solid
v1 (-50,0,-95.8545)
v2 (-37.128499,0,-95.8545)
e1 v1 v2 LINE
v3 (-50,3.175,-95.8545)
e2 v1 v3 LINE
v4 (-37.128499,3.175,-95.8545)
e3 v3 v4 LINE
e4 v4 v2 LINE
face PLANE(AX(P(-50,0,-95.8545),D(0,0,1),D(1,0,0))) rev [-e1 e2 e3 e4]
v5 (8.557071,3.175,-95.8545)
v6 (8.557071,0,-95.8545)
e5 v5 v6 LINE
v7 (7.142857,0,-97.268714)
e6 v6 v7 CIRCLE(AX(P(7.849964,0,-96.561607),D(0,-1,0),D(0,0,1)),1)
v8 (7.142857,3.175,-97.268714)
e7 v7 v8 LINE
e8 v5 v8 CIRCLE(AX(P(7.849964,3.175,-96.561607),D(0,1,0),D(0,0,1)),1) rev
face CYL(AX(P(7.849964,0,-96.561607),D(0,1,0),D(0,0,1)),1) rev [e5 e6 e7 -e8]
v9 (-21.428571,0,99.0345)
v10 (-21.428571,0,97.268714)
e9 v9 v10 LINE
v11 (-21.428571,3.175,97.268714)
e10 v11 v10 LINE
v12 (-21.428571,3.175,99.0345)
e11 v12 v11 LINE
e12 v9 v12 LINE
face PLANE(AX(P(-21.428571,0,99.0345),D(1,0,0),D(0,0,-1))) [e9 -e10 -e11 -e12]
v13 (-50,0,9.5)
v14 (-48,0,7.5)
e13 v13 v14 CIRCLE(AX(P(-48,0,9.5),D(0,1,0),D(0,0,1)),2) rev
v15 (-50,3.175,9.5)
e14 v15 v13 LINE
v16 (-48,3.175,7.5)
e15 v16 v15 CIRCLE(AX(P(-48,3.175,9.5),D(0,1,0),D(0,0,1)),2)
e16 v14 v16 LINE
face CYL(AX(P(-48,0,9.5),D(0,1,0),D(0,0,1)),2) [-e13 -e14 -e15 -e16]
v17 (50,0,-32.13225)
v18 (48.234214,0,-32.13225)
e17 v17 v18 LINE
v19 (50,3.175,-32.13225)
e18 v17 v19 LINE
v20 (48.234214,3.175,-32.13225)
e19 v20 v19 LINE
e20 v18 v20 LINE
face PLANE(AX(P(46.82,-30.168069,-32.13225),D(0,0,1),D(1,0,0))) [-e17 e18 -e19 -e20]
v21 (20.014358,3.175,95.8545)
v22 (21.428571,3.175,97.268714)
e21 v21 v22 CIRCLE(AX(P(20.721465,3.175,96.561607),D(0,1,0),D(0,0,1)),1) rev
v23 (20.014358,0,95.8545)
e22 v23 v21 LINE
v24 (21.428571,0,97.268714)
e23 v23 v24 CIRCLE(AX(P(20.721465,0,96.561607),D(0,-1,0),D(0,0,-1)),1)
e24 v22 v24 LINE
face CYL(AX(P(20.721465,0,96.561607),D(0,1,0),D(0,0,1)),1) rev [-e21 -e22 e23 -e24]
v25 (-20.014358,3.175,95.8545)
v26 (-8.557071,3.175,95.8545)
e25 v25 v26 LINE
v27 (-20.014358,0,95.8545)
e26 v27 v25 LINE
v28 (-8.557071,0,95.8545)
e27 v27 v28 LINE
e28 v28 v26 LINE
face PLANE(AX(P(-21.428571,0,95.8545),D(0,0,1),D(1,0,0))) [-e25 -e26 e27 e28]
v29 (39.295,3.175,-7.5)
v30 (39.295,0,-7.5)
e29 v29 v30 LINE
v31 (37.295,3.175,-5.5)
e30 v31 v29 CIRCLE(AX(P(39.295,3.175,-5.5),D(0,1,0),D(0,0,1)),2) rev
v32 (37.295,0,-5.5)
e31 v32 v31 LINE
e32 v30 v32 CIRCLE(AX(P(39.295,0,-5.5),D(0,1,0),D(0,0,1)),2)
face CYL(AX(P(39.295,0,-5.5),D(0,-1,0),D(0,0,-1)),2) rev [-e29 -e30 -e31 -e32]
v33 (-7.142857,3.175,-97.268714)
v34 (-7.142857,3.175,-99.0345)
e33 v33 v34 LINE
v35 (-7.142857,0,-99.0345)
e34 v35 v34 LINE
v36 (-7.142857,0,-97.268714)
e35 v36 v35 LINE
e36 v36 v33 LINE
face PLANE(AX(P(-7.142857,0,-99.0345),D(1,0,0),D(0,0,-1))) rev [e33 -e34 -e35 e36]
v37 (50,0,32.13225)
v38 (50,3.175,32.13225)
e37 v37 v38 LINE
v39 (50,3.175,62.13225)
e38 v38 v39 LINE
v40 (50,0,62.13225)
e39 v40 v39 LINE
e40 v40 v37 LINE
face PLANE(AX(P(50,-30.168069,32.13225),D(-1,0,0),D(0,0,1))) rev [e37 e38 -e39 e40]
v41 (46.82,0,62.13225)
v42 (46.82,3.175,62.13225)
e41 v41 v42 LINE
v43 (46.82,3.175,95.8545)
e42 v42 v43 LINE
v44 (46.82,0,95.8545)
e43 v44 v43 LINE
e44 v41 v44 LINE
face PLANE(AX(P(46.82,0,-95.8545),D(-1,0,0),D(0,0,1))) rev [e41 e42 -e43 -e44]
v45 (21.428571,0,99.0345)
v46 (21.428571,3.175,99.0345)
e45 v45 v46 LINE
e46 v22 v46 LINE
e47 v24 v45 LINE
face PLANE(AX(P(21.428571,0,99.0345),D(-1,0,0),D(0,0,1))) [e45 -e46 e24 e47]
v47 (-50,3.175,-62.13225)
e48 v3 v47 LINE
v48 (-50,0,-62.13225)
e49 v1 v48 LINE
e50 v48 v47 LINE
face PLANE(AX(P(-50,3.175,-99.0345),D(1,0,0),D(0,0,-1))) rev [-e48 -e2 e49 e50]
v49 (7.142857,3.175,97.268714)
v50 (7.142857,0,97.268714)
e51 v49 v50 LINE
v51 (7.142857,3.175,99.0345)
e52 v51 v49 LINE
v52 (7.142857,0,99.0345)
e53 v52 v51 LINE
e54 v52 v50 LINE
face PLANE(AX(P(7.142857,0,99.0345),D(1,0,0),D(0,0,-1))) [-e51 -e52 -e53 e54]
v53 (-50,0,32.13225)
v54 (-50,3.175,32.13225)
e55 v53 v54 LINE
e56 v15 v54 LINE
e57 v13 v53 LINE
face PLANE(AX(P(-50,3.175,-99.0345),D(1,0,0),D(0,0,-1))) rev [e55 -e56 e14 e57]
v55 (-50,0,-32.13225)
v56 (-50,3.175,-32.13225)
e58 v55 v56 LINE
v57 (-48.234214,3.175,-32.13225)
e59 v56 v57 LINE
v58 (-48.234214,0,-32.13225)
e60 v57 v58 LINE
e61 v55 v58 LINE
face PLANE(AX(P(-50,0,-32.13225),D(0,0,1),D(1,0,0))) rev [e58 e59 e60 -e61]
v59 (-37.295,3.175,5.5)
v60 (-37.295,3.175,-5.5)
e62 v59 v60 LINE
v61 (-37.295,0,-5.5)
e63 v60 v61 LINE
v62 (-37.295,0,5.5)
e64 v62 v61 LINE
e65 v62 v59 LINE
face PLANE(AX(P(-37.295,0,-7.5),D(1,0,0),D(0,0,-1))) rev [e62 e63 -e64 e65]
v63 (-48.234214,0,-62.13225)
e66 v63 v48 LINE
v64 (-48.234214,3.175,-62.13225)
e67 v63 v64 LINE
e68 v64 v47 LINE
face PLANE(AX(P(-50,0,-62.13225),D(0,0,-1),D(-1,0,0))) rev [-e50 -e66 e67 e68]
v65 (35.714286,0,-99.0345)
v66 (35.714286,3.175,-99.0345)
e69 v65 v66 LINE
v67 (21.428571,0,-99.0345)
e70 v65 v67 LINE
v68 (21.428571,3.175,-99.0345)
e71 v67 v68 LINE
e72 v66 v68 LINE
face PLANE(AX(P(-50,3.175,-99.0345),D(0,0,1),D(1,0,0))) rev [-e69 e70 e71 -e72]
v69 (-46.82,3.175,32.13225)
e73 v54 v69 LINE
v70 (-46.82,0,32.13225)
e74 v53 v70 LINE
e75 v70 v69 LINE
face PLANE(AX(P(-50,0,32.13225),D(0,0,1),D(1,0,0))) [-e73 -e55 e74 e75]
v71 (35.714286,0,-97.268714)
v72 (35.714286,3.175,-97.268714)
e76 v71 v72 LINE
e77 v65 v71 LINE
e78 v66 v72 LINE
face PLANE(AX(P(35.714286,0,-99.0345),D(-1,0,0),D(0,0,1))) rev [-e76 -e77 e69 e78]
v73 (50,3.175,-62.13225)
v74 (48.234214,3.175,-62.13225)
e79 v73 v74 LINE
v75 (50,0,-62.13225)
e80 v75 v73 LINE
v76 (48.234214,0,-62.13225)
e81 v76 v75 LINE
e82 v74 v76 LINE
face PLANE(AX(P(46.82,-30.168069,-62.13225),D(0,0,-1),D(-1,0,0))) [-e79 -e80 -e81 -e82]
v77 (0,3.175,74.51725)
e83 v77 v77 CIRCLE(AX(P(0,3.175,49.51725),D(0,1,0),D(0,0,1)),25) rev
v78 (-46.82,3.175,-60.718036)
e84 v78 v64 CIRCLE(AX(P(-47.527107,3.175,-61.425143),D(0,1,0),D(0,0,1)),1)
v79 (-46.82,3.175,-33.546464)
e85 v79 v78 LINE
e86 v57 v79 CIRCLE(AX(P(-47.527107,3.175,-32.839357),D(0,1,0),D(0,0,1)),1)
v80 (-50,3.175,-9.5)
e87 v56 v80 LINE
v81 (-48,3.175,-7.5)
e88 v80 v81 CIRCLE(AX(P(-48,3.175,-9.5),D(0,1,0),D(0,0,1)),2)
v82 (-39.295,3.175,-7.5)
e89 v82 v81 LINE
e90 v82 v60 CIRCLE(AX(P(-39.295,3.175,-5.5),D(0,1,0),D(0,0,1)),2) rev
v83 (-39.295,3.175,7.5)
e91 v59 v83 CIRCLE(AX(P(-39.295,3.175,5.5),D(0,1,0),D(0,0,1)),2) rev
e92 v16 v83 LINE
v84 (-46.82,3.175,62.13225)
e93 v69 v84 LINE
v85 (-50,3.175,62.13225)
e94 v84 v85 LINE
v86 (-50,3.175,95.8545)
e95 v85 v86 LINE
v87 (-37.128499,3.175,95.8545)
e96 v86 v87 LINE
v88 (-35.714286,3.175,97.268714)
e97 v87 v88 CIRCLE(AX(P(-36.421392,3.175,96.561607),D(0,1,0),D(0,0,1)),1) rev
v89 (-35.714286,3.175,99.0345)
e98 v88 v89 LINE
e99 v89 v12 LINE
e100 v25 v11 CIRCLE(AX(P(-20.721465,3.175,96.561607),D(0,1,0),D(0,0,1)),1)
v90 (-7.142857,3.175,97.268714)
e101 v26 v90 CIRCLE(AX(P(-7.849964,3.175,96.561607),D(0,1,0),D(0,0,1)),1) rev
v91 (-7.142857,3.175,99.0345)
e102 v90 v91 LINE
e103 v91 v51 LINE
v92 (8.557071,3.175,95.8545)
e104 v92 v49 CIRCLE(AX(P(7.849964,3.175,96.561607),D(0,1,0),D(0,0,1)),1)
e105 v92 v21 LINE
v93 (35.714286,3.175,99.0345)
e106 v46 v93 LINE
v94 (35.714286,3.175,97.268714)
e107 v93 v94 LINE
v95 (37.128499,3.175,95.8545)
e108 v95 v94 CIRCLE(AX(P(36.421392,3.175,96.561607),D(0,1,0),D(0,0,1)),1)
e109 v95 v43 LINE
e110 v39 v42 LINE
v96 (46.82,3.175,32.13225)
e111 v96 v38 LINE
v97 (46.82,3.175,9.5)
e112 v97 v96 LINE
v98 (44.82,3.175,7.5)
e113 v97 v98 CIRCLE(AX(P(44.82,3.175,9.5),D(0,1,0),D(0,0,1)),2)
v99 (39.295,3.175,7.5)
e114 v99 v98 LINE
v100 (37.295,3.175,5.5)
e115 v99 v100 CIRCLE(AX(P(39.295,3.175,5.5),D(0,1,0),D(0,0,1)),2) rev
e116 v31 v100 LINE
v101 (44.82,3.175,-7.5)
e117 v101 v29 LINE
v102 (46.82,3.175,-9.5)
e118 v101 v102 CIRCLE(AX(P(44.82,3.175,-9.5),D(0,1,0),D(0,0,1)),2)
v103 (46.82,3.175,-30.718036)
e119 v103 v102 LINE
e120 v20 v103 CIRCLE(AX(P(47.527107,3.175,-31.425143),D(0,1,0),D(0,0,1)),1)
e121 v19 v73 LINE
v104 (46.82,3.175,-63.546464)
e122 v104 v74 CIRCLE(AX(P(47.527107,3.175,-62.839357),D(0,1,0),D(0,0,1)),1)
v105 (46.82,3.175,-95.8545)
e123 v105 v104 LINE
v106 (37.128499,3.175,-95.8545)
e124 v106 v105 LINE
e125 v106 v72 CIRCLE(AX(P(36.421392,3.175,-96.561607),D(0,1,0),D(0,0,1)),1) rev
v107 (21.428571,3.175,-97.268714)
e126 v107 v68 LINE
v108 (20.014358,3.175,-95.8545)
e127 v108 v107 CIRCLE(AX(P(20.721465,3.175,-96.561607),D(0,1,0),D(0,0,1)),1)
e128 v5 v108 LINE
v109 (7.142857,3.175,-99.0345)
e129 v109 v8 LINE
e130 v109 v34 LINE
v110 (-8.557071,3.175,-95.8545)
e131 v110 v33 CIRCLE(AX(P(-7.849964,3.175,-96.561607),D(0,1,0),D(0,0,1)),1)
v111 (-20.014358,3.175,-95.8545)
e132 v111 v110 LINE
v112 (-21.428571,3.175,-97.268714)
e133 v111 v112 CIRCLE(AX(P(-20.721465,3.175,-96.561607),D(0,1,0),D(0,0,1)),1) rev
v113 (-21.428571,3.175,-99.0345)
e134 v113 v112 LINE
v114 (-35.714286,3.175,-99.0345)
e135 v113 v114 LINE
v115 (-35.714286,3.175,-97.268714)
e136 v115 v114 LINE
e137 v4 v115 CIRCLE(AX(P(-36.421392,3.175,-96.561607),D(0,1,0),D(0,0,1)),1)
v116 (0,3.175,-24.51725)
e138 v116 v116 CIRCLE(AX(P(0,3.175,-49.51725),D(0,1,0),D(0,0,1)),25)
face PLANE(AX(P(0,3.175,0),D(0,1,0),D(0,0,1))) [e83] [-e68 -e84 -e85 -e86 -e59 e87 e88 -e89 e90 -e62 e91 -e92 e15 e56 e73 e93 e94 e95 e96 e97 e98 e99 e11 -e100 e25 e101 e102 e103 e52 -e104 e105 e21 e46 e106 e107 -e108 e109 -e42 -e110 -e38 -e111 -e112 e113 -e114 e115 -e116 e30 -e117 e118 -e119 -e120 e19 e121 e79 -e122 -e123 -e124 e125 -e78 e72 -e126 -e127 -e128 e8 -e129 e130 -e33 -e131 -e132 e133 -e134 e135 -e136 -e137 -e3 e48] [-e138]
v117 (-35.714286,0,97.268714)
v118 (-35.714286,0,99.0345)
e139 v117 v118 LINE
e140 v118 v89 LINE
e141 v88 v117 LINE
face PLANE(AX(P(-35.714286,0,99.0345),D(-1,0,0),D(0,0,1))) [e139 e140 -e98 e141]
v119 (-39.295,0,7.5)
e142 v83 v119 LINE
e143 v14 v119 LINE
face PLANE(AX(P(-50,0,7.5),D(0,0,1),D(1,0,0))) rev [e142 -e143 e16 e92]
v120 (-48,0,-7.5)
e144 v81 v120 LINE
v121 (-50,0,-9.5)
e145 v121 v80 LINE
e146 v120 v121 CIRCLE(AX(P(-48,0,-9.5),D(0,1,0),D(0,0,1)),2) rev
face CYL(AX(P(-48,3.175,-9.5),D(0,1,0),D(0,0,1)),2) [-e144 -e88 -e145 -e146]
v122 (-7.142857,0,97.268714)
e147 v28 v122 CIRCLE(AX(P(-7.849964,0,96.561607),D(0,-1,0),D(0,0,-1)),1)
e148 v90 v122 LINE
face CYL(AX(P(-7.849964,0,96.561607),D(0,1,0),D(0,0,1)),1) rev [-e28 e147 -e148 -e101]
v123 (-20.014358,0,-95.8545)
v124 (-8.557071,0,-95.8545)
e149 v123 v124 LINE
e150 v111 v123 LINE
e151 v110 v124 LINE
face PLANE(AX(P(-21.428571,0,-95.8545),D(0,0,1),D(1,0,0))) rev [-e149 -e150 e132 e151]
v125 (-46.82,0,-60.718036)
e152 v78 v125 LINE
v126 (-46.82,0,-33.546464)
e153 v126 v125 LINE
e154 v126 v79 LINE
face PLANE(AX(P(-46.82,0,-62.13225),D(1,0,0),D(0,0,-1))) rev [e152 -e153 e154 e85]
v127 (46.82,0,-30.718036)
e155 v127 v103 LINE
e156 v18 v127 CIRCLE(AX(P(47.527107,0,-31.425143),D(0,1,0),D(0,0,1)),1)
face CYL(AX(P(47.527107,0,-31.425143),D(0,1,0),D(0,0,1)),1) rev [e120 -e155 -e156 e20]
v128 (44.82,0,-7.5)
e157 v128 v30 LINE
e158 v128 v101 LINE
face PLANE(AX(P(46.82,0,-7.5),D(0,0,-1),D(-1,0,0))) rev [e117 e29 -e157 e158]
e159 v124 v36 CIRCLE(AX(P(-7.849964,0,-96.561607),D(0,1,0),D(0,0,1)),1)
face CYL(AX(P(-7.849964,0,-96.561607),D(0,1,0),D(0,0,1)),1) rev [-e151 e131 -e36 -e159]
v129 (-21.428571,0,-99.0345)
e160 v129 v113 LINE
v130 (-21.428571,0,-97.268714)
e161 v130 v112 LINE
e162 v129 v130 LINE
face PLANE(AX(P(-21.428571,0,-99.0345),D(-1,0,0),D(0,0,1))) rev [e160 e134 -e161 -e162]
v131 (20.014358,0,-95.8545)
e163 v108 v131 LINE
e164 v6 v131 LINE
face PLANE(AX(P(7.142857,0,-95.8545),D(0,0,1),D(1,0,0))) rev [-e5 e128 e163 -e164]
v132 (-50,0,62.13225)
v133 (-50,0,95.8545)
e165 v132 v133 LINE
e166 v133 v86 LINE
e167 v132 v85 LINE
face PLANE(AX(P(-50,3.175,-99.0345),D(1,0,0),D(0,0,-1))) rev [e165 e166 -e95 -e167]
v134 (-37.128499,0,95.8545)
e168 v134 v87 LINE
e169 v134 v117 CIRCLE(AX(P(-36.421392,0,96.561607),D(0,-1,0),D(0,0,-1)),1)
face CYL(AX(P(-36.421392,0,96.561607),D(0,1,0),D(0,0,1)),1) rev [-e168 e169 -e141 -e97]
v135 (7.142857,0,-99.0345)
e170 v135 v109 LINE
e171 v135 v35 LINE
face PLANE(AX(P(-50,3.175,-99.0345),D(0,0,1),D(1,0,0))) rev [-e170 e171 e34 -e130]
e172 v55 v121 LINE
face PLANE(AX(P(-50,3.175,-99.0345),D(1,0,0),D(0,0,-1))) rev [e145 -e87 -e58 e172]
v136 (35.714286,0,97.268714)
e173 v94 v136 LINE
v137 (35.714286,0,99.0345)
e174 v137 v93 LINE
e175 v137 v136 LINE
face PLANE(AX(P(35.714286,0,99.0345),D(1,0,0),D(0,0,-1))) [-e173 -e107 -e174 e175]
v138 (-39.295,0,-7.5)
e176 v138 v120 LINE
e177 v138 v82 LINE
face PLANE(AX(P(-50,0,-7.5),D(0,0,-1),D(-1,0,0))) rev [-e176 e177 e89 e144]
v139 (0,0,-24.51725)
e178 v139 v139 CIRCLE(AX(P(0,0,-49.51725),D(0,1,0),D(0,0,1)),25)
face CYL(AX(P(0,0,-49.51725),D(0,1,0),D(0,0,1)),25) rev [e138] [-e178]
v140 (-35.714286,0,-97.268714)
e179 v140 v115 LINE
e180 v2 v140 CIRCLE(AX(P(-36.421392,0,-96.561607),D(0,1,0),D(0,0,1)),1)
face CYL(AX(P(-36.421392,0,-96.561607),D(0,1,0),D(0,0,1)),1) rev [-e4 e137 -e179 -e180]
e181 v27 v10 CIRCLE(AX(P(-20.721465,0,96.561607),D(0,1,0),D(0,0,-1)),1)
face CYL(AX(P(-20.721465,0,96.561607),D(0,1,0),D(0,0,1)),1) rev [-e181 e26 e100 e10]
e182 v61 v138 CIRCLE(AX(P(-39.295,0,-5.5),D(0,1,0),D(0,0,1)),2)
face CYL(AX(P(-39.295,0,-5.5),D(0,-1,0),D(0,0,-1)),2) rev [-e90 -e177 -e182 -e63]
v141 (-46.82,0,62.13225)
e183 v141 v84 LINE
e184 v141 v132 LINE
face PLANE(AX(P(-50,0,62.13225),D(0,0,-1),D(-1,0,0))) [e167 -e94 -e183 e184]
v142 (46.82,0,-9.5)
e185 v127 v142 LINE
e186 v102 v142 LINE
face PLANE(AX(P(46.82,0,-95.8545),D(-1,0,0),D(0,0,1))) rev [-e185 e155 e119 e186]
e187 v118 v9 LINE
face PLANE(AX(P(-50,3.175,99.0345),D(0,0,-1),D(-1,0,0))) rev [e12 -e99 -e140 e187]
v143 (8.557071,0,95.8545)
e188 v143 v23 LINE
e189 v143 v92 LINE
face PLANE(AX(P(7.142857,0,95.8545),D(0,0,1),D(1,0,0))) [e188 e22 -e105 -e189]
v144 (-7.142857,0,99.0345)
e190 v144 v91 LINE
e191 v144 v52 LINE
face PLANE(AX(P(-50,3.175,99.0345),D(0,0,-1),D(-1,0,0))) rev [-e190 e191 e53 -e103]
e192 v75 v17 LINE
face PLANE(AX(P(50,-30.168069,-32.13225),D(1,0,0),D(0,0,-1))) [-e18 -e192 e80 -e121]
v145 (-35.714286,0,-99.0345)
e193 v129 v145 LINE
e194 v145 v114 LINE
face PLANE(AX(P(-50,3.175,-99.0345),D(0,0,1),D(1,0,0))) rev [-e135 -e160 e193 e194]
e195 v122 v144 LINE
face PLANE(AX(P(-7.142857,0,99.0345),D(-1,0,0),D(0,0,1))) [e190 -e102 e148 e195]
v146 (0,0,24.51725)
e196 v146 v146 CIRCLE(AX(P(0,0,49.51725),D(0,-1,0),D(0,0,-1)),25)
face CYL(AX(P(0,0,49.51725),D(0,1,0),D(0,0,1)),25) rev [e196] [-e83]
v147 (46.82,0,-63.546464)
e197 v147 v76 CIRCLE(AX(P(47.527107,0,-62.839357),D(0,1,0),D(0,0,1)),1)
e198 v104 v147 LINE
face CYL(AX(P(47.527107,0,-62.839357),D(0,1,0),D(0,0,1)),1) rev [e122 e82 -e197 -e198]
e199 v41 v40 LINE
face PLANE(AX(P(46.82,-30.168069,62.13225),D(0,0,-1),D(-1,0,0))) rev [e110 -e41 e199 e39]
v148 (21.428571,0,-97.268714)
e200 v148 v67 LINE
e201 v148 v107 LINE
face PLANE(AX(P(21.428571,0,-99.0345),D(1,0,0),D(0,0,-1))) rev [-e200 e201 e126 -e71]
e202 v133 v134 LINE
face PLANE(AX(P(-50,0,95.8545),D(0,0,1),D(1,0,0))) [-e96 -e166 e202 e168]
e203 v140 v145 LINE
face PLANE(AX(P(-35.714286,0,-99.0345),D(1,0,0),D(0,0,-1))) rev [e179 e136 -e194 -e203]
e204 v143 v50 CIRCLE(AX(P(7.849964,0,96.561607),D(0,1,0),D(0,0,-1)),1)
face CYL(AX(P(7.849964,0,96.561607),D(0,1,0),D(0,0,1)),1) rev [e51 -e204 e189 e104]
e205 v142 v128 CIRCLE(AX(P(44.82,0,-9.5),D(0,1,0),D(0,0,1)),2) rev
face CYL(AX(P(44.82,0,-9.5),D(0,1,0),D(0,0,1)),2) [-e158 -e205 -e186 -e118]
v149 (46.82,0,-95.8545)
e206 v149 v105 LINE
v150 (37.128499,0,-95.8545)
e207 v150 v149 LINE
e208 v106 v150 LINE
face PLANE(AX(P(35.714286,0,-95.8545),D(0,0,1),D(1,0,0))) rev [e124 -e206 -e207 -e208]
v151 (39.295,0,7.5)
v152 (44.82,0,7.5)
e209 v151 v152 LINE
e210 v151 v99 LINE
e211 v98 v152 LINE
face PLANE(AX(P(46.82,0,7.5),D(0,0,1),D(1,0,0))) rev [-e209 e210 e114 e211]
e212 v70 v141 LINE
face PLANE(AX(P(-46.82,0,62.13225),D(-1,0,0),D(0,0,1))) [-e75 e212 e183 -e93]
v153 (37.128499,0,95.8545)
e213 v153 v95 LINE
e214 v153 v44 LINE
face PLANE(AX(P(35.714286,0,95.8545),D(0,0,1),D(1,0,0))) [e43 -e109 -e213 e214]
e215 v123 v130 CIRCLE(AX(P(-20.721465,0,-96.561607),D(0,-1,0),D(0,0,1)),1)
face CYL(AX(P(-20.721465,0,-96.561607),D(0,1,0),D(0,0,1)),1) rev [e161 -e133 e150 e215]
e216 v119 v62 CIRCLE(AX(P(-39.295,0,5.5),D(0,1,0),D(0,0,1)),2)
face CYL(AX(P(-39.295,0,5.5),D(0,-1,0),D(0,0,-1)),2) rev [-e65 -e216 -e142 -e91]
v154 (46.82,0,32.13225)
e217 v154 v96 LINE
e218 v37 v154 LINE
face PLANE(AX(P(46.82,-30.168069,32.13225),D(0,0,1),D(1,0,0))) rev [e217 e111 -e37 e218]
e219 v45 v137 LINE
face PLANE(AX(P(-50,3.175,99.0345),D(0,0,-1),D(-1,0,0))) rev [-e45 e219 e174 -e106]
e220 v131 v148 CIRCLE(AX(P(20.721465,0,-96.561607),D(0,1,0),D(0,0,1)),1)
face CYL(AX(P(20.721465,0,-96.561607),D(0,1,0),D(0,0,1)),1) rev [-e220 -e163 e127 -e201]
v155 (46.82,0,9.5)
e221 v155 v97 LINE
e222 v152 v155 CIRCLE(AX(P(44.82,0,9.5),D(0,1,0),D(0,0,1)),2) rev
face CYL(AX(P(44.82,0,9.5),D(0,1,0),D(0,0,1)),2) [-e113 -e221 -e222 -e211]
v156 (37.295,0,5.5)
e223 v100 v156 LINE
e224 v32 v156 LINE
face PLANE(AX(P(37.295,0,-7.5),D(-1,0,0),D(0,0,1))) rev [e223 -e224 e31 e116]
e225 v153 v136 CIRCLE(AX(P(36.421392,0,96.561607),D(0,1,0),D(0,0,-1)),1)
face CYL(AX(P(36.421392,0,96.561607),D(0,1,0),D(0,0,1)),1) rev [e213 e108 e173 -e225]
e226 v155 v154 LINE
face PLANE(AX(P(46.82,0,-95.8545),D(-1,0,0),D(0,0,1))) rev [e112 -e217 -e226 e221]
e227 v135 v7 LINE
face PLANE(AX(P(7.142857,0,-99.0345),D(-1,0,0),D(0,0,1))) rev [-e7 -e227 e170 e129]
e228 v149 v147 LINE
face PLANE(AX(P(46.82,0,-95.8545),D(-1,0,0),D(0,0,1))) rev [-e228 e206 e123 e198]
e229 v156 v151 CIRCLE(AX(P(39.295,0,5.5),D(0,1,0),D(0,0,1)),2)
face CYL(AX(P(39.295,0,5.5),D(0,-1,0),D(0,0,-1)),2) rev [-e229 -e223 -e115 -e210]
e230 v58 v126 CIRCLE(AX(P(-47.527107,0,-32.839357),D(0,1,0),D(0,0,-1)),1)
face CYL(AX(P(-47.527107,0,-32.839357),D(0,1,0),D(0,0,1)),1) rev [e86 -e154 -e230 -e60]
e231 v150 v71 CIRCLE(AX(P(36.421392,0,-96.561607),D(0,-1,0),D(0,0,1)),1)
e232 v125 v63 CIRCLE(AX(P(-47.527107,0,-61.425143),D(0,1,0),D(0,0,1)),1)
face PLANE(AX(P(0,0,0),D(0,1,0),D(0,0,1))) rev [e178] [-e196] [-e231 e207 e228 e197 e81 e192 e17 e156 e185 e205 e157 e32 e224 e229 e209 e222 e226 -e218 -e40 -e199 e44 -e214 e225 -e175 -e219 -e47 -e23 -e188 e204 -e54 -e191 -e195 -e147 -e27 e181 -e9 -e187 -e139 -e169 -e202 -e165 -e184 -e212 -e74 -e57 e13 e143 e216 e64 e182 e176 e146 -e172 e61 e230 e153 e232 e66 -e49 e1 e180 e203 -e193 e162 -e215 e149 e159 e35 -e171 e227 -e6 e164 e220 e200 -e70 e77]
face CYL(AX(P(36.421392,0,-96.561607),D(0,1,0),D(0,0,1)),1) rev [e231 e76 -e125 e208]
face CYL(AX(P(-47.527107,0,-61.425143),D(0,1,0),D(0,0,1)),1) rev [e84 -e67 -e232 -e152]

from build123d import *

# Parameters (mm, degrees)
SKETCH1_W                 = 100
SKETCH1_H                 = 198.069
BOSS_EXTRUDE1_DEPTH       = 3.175
SKETCH2_W                 = 14.285714286
SKETCH2_H                 = 3.18
ENDSLOTS_DEPTH            = 111.986092891
GIVEUPCORNER_DEPTH        = 111.986092891
GIVEUPCORNER_DEPTH_BACK   = 111.986092891
SKETCH6_W                 = 3.18
SKETCH6_H                 = 194.889
SKETCH3_W                 = 3.18
SKETCH3_H                 = 30
BOSS_EXTRUDE2_DEPTH       = 3.175
SKETCH4_W                 = 3.18
SKETCH4_H                 = 30
CUT_EXTRUDE2_DEPTH        = 111.986092891
SKETCH7_R                 = 1
CUT_EXTRUDE5_DEPTH        = 111.986092891
SKETCH_PATTERN1_DEPTH     = 3.175
CUT_EXTRUDE6_DEPTH        = 111.986092891
CUT_EXTRUDE6_DEPTH_BACK   = 111.986092891
SKETCH9_R                 = 1
SKETCH10_R                = 25
WEIGHTCUTOUT_DEPTH        = 111.986092891
ZSYMMETRY_COPY_1_SKETCH_R = 1
ZSYMMETRY_COPY_1_DEPTH    = 111.986092891
ZSYMMETRY_COPY_2_DEPTH    = 3.175
ZIPTIESLOTS_DEPTH         = 111.986092891
ZIPTIESLOTS_DEPTH_BACK    = 111.986092891
SKETCH5_W                 = 9.525
SKETCH5_H                 = 15
SKETCH5_W_2               = 12.705
FILLET1_R                 = 2


# Read off the part's stored shape, not the designer's step: Sketch-Pattern1
with BuildPart() as part:
    # Sketch1 → Boss-Extrude1 (new body)
    with BuildSketch(Plane(origin=(0, 0, 0), x_dir=(1, 0, 0), z_dir=(0, 1, 0))):
        Rectangle(SKETCH1_W, SKETCH1_H)
    extrude(amount=BOSS_EXTRUDE1_DEPTH)

    # Sketch2 → endSlots (cut, symmetric)
    with BuildSketch(Plane(origin=(0, 3.175, 0), x_dir=(1, 0, 0), z_dir=(0, 1, 0))):
        with Locations((-42.857142857, 97.4445)):
            Rectangle(SKETCH2_W, SKETCH2_H)
        with Locations((-14.285714286, 97.4445)):
            Rectangle(SKETCH2_W, SKETCH2_H)
        with Locations((14.285714286, 97.4445)):
            Rectangle(SKETCH2_W, SKETCH2_H)
        with Locations((42.857142857, 97.4445)):
            Rectangle(SKETCH2_W, SKETCH2_H)
    endslots = extrude(amount=ENDSLOTS_DEPTH, both=True, mode=Mode.SUBTRACT)

    # Sketch6 → giveUpCorner (cut, two sides: drawn at the far end of the back side and taken through both)
    with BuildSketch(Plane(origin=(0, 3.175, 0), x_dir=(1, 0, 0), z_dir=(0, 1, 0)).offset(-GIVEUPCORNER_DEPTH_BACK)):
        with Locations((48.41, -1.59)):
            Rectangle(SKETCH6_W, SKETCH6_H)
    extrude(amount=GIVEUPCORNER_DEPTH + GIVEUPCORNER_DEPTH_BACK, mode=Mode.SUBTRACT)

    # Sketch3 → Boss-Extrude2 (add)
    with BuildSketch(Plane(origin=(0, 3.175, 0), x_dir=(1, 0, 0), z_dir=(0, 1, 0))):
        with Locations((48.41, 47.13225)):
            Rectangle(SKETCH3_W, SKETCH3_H)
    boss_extrude2 = extrude(amount=-BOSS_EXTRUDE2_DEPTH)

    # Sketch4 → Cut-Extrude2 (cut, symmetric)
    with BuildSketch(Plane(origin=(0, 3.175, 0), x_dir=(1, 0, 0), z_dir=(0, 1, 0))):
        with Locations((-48.41, 47.13225)):
            Rectangle(SKETCH4_W, SKETCH4_H)
    cut_extrude2 = extrude(amount=CUT_EXTRUDE2_DEPTH, both=True, mode=Mode.SUBTRACT)

    # Sketch7 → Cut-Extrude5 (cut, symmetric)
    with BuildSketch(Plane(origin=(0, 3.175, 0), x_dir=(1, 0, 0), z_dir=(0, 1, 0))):
        with Locations((-36.421392495, 96.561606781)):
            Circle(SKETCH7_R)
    cut_extrude5 = extrude(amount=CUT_EXTRUDE5_DEPTH, both=True, mode=Mode.SUBTRACT)

    # Sketch-Pattern1 outline → Sketch-Pattern1 (cut)
    with BuildSketch(Plane(origin=(0, 0, 0), x_dir=(1, 0, 0), z_dir=(0, 1, 0))):
        with BuildLine():
            Line((-7.142857143, 95.8545), (-8.557070705, 95.8545))
            ThreePointArc((-8.557070705, 95.8545), (-7.849963924, 95.561606781), (-7.142857143, 95.8545))
        make_face()
        with BuildLine():
            Line((-7.142857143, 97.268713562), (-7.142857143, 95.8545))
            ThreePointArc((-7.142857143, 95.8545), (-6.849963924, 96.561606781), (-7.142857143, 97.268713562))
        make_face()
        with BuildLine():
            Line((21.428571429, 95.8545), (20.014357866, 95.8545))
            ThreePointArc((20.014357866, 95.8545), (20.721464647, 95.561606781), (21.428571429, 95.8545))
        make_face()
        with BuildLine():
            Line((21.428571429, 97.268713562), (21.428571429, 95.8545))
            ThreePointArc((21.428571429, 95.8545), (21.721464648, 96.561606781), (21.428571429, 97.268713562))
        make_face()
    sketch_pattern1 = extrude(amount=SKETCH_PATTERN1_DEPTH, mode=Mode.SUBTRACT)

    # Mirror3: Cut-Extrude5, Sketch-Pattern1 across plane
    add(cut_extrude5.mirror(Plane(origin=(0, 0, 0), x_dir=(0, 0, 1), z_dir=(1, 0, 0))), mode=Mode.SUBTRACT)
    add(sketch_pattern1.mirror(Plane(origin=(0, 0, 0), x_dir=(0, 0, 1), z_dir=(1, 0, 0))), mode=Mode.SUBTRACT)

    # Sketch9 → Cut-Extrude6 (cut, two sides: drawn at the far end of the back side and taken through both)
    with BuildSketch(Plane(origin=(0, 3.175, 0), x_dir=(1, 0, 0), z_dir=(0, 1, 0)).offset(-CUT_EXTRUDE6_DEPTH_BACK)):
        with Locations((-47.527106781, 61.425143219)):
            Circle(SKETCH9_R)
        with Locations((47.527106781, 31.425143219)):
            Circle(SKETCH9_R)
        with Locations((47.527106781, 62.839356781)):
            Circle(SKETCH9_R)
        with Locations((-47.527106781, 32.839356781)):
            Circle(SKETCH9_R)
    extrude(amount=CUT_EXTRUDE6_DEPTH + CUT_EXTRUDE6_DEPTH_BACK, mode=Mode.SUBTRACT)

    # Sketch10 → weightCutout (cut, symmetric)
    with BuildSketch(Plane(origin=(0, 3.175, 0), x_dir=(1, 0, 0), z_dir=(0, 1, 0))):
        with Locations(Location((0, 49.51725, 0), (0, 0, 270))):
            Circle(SKETCH10_R)
    weightcutout = extrude(amount=WEIGHTCUTOUT_DEPTH, both=True, mode=Mode.SUBTRACT)

    # zSymmetry: endSlots, Boss-Extrude2, Cut-Extrude2, Cut-Extrude5, Sketch-Pattern1, weightCutout across plane
    add(endslots.mirror(Plane.XY), mode=Mode.SUBTRACT)
    add(boss_extrude2.mirror(Plane.XY))
    add(cut_extrude2.mirror(Plane.XY), mode=Mode.SUBTRACT)
    add(cut_extrude5.mirror(Plane.XY), mode=Mode.SUBTRACT)
    add(sketch_pattern1.mirror(Plane.XY), mode=Mode.SUBTRACT)
    add(weightcutout.mirror(Plane.XY), mode=Mode.SUBTRACT)

    # zSymmetry copy 1 sketch → zSymmetry copy 1 (cut, symmetric)
    with BuildSketch(Plane(origin=(0, 3.175, 0), x_dir=(-1, 0, 0), z_dir=(0, 1, 0))):
        with Locations((-36.421392495, 96.561606781)):
            Circle(ZSYMMETRY_COPY_1_SKETCH_R)
    extrude(amount=ZSYMMETRY_COPY_1_DEPTH, both=True, mode=Mode.SUBTRACT)

    # zSymmetry copy 2 sketch → zSymmetry copy 2 (cut)
    with BuildSketch(Plane(origin=(0, 0, 0), x_dir=(-1, 0, 0), z_dir=(0, 1, 0))):
        with BuildLine():
            Line((-7.142857143, 95.8545), (-8.557070705, 95.8545))
            ThreePointArc((-8.557070705, 95.8545), (-7.849963924, 95.561606781), (-7.142857143, 95.8545))
        make_face()
        with BuildLine():
            Line((-7.142857143, 97.268713562), (-7.142857143, 95.8545))
            ThreePointArc((-7.142857143, 95.8545), (-6.849963924, 96.561606781), (-7.142857143, 97.268713562))
        make_face()
        with BuildLine():
            Line((21.428571429, 95.8545), (20.014357866, 95.8545))
            ThreePointArc((20.014357866, 95.8545), (20.721464647, 95.561606781), (21.428571429, 95.8545))
        make_face()
        with BuildLine():
            Line((21.428571429, 97.268713562), (21.428571429, 95.8545))
            ThreePointArc((21.428571429, 95.8545), (21.721464648, 96.561606781), (21.428571429, 97.268713562))
        make_face()
    extrude(amount=ZSYMMETRY_COPY_2_DEPTH, mode=Mode.SUBTRACT)

    # Sketch5 → zipTieSlots (cut, two sides: drawn at the far end of the back side and taken through both)
    with BuildSketch(Plane(origin=(0, 3.175, 0), x_dir=(1, 0, 0), z_dir=(0, 1, 0)).offset(-ZIPTIESLOTS_DEPTH_BACK)):
        with Locations((42.0575, 0)):
            Rectangle(SKETCH5_W, SKETCH5_H)
        with Locations((-43.6475, 0)):
            Rectangle(SKETCH5_W_2, SKETCH5_H)
    extrude(amount=ZIPTIESLOTS_DEPTH + ZIPTIESLOTS_DEPTH_BACK, mode=Mode.SUBTRACT)

    # Fillet1
    fillet1_edges = [part.edges().sort_by_distance(p)[0] for p in [
        (46.82, 1.5875, -7.5),
        (46.82, 1.5875, 7.5),
        (37.295, 1.5875, 7.5),
        (37.295, 1.5875, -7.5),
        (-50, 1.5875, 7.5),
        (-50, 1.5875, -7.5),
        (-37.295, 1.5875, -7.5),
        (-37.295, 1.5875, 7.5),
    ]]
    fillet(fillet1_edges, radius=FILLET1_R)


solid = part.part
